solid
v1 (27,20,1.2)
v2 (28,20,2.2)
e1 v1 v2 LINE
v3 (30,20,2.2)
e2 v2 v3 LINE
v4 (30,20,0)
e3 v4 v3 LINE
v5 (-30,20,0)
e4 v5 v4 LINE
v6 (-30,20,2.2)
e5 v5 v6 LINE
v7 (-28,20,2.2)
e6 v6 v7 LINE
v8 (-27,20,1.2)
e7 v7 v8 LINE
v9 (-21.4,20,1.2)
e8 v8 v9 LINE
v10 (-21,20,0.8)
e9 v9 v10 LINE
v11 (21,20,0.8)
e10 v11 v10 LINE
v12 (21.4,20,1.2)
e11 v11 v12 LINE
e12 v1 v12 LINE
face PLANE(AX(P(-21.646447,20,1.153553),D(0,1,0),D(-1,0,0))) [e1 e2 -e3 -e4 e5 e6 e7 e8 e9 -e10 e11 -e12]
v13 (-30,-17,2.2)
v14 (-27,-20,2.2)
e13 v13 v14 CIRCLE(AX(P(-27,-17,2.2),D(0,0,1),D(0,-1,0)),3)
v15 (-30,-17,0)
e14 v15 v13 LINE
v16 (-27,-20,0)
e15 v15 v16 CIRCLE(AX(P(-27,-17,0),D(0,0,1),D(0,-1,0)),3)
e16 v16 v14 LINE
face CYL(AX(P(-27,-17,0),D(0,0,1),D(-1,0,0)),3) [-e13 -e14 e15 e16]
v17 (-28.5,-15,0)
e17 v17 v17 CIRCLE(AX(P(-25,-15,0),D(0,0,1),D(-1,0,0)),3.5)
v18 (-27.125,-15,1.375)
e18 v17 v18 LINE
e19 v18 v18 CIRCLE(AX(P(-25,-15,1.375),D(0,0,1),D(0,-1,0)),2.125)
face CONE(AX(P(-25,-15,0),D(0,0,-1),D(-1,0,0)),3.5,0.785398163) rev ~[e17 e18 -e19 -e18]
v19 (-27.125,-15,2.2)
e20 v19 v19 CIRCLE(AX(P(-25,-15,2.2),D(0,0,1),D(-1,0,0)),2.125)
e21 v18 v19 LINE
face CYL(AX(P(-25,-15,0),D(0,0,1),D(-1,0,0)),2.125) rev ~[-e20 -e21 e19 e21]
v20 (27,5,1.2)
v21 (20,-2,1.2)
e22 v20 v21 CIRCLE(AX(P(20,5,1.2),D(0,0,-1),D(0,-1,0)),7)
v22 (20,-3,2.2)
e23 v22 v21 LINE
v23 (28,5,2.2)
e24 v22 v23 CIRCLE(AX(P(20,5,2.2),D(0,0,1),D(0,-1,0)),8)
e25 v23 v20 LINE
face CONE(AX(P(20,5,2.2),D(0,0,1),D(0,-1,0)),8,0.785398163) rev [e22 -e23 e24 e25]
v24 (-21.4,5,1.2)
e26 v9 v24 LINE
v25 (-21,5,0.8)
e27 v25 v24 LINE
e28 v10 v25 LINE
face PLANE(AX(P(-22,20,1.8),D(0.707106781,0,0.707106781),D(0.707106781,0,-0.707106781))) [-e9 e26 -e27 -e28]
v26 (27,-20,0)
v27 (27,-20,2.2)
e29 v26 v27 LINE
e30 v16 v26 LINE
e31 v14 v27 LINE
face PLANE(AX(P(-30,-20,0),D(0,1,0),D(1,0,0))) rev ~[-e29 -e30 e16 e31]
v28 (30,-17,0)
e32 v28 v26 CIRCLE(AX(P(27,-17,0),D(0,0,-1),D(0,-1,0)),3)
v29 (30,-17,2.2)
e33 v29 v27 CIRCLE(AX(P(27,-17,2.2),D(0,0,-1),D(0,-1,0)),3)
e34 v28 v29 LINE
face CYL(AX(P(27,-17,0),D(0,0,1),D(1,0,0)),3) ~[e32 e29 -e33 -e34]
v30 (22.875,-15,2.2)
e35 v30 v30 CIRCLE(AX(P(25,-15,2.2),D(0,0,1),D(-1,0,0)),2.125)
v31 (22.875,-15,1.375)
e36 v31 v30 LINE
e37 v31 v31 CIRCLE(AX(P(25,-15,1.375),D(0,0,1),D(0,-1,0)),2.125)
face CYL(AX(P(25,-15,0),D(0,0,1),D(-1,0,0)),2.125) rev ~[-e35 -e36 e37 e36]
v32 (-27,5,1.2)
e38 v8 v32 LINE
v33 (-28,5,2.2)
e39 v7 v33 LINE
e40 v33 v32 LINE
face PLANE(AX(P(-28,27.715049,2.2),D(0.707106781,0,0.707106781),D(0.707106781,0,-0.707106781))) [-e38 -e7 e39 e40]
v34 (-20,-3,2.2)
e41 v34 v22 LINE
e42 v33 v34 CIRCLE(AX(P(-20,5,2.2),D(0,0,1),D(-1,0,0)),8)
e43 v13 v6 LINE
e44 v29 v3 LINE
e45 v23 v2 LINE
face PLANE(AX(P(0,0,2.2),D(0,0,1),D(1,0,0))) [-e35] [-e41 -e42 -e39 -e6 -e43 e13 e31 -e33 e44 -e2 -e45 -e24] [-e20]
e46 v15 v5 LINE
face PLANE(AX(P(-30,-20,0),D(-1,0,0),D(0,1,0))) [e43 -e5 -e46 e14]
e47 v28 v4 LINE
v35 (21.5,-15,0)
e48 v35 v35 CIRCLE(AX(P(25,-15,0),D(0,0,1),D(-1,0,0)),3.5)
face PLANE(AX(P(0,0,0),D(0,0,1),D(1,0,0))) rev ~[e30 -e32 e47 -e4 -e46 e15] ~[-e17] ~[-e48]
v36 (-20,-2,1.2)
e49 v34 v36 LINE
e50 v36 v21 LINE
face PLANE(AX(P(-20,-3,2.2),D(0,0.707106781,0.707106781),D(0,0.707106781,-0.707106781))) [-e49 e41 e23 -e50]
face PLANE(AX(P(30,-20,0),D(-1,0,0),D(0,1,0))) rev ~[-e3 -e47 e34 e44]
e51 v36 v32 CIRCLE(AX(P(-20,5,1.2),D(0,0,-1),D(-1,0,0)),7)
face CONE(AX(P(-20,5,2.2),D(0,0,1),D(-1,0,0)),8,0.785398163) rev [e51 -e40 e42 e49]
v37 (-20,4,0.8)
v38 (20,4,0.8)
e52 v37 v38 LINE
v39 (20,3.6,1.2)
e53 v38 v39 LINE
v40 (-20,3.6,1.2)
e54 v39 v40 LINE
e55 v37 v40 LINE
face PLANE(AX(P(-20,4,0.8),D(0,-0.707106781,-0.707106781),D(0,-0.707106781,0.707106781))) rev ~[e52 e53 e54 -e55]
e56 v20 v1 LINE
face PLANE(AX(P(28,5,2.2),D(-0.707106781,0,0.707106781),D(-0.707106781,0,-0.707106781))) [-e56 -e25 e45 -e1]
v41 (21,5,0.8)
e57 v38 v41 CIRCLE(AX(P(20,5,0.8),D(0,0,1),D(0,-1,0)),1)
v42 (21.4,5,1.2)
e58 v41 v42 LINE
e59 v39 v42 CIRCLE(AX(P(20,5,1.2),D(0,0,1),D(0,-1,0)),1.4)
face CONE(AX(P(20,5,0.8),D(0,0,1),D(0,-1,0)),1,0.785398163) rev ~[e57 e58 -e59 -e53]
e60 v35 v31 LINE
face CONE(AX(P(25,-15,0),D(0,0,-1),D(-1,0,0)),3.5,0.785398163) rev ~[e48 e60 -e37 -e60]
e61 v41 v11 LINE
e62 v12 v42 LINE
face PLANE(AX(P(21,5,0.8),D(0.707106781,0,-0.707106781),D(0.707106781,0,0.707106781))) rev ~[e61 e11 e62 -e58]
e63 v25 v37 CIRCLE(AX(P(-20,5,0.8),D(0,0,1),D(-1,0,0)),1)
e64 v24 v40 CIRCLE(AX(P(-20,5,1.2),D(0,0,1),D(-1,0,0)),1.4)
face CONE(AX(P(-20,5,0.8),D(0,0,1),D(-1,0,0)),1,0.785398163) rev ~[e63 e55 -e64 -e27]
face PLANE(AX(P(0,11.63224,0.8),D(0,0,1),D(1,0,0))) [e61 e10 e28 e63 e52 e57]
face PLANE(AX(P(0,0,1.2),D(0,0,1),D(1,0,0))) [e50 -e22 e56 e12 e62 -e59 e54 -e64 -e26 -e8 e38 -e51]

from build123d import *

# Parameters (mm, degrees)
F0_W           = 60
F0_H           = 40
F1_DEPTH       = 2.2
F2_D           = 4.25
F2_DEPTH       = 15
F2_CSINK_D     = 7
F2_CSINK_ANGLE = 90
F2_TIP         = 1.2768288154
F3_R           = 3
F4_W           = 50
F4_H           = 20
F5_DEPTH       = 1
F6_R           = 5
F7_T4_ANGLE    = 90
F7_T9_DEPTH    = 40
F7_T14_DEPTH   = 22.7150489639
F7_T19_ANGLE   = 90
F7_T24_DEPTH   = 22.7150489639
F9_DEPTH       = 0.4
F10_T4_ANGLE   = 90
F10_T9_DEPTH   = 40
F10_T14_DEPTH  = 15
F10_T19_ANGLE  = 90
F10_T24_DEPTH  = 15


# Not quite as in the source:
# - a fillet or chamfer that OpenCascade refuses, or shapes differently, is made with other operations: its cross-section is extruded or revolved along the edge and cut away or added


with BuildPart() as f1:
    # F0 (on Top) → F1 (new body)
    with BuildSketch(Plane.XY):
        Rectangle(F0_W, F0_H)
    extrude(amount=F1_DEPTH)

    # F2
    with Locations(Plane(origin=(0, 0, 0), x_dir=(1, 0, 0), z_dir=(0, 0, -1))):
        with Locations((-25, 15), (25, 15)):
            CounterSinkHole(F2_D / 2, F2_CSINK_D / 2, depth=F2_DEPTH, counter_sink_angle=F2_CSINK_ANGLE)
            with Locations((0, 0, -(F2_DEPTH + F2_TIP / 2))):  # 118° drill point
                Cone(0, F2_D / 2, F2_TIP, mode=Mode.SUBTRACT)

    # F3
    f3_edges = [f1.edges().sort_by_distance(p)[0] for p in [
        (-30, -20, 1.1),
        (30, -20, 1.1),
    ]]
    fillet(f3_edges, radius=F3_R)

    # F4 (on face) → F5 (cut)
    with BuildSketch(Plane.XY.offset(2.2)):
        with Locations((0, 10)):
            Rectangle(F4_W, F4_H)
    extrude(amount=-F5_DEPTH, mode=Mode.SUBTRACT)

    # F6
    f6_edges = [f1.edges().sort_by_distance(p)[0] for p in [
        (25, 0, 1.7),
        (-25, 0, 1.7),
    ]]
    fillet(f6_edges, radius=F6_R)

    # F7: chamfer of 3 on 1 edges, made by hand


with BuildPart() as f7_tool2:
    # F7_s3 → F7_t4 (revolve)
    with BuildSketch(Plane.YZ.offset(20)):
        Polygon((-3, 2.2), (0, -0.8), (0, 2.2), align=None)
    revolve(axis=Axis((20, 5, 2.2), (0, 0, 1)), revolution_arc=F7_T4_ANGLE)

    split(bisect_by=Plane.XY.offset(1.2), keep=Keep.TOP)


with BuildPart() as f1_1:
    add(f1.part)

    # F7_t1: cut F7_tool2
    add(f7_tool2.part, mode=Mode.SUBTRACT)


with BuildPart() as f7_tool7:
    # F7_s8 → F7_t9 (new body)
    with BuildSketch(Plane.YZ.offset(-20)):
        Polygon((-3, 2.2), (0, -0.8), (0, 2.2), align=None)
    extrude(amount=F7_T9_DEPTH)

    split(bisect_by=Plane.XY.offset(1.2), keep=Keep.TOP)


with BuildPart() as f1_2:
    add(f1_1.part)

    # F7_t6: cut F7_tool7
    add(f7_tool7.part, mode=Mode.SUBTRACT)


with BuildPart() as f7_tool12:
    # F7_s13 → F7_t14 (new body)
    with BuildSketch(Plane.XZ.offset(-5)):
        Polygon((28, 2.2), (25, -0.8), (25, 2.2), align=None)
    extrude(amount=-F7_T14_DEPTH)

    split(bisect_by=Plane.XY.offset(1.2), keep=Keep.TOP)


with BuildPart() as f1_3:
    add(f1_2.part)

    # F7_t11: cut F7_tool12
    add(f7_tool12.part, mode=Mode.SUBTRACT)


with BuildPart() as f7_tool17:
    # F7_s18 → F7_t19 (revolve)
    with BuildSketch(Plane.XZ.offset(-5)):
        Polygon((-28, 2.2), (-25, -0.8), (-25, 2.2), align=None)
    revolve(axis=Axis((-20, 5, 2.2), (0, 0, 1)), revolution_arc=F7_T19_ANGLE)

    split(bisect_by=Plane.XY.offset(1.2), keep=Keep.TOP)


with BuildPart() as f1_4:
    add(f1_3.part)

    # F7_t16: cut F7_tool17
    add(f7_tool17.part, mode=Mode.SUBTRACT)


with BuildPart() as f7_tool22:
    # F7_s23 → F7_t24 (new body)
    with BuildSketch(Plane.XZ.offset(-27.7150489639)):
        Polygon((-28, 2.2), (-25, -0.8), (-25, 2.2), align=None)
    extrude(amount=F7_T24_DEPTH)

    split(bisect_by=Plane.XY.offset(1.2), keep=Keep.TOP)


with BuildPart() as f1_5:
    add(f1_4.part)

    # F7_t21: cut F7_tool22
    add(f7_tool22.part, mode=Mode.SUBTRACT)

    # F8 (on face) → F9 (cut)
    with BuildSketch(Plane.XY.offset(1.2)):
        with BuildLine():
            ThreePointArc((20, 3), (21.4142135624, 3.5857864376), (22, 5))
            Line((22, 5), (22, 20))
            Line((22, 20), (-22, 20))
            Line((-22, 20), (-22, 5))
            ThreePointArc((-22, 5), (-21.4142135624, 3.5857864376), (-20, 3))
            Line((-20, 3), (20, 3))
        make_face()
    extrude(amount=-F9_DEPTH, mode=Mode.SUBTRACT)

    # F10: chamfer of 1 on 1 edges, made by hand


with BuildPart() as f10_tool2:
    # F10_s3 → F10_t4 (revolve)
    with BuildSketch(Plane.YZ.offset(20)):
        Polygon((4, 0.8), (3, 1.8), (3, 0.8), align=None)
    revolve(axis=Axis((20, 5, 0.8), (0, 0, 1)), revolution_arc=F10_T4_ANGLE)

    split(bisect_by=Plane.XY.offset(1.2), keep=Keep.BOTTOM)


with BuildPart() as f1_6:
    add(f1_5.part)

    # F10_t1: union F10_tool2
    add(f10_tool2.part)


with BuildPart() as f10_tool7:
    # F10_s8 → F10_t9 (new body)
    with BuildSketch(Plane.YZ.offset(-20)):
        Polygon((4, 0.8), (3, 1.8), (3, 0.8), align=None)
    extrude(amount=F10_T9_DEPTH)

    split(bisect_by=Plane.XY.offset(1.2), keep=Keep.BOTTOM)


with BuildPart() as f1_7:
    add(f1_6.part)

    # F10_t6: union F10_tool7
    add(f10_tool7.part)


with BuildPart() as f10_tool12:
    # F10_s13 → F10_t14 (new body)
    with BuildSketch(Plane.XZ.offset(-5)):
        Polygon((21, 0.8), (22, 1.8), (22, 0.8), align=None)
    extrude(amount=-F10_T14_DEPTH)

    split(bisect_by=Plane.XY.offset(1.2), keep=Keep.BOTTOM)


with BuildPart() as f1_8:
    add(f1_7.part)

    # F10_t11: union F10_tool12
    add(f10_tool12.part)


with BuildPart() as f10_tool17:
    # F10_s18 → F10_t19 (revolve)
    with BuildSketch(Plane.XZ.offset(-5)):
        Polygon((-21, 0.8), (-22, 1.8), (-22, 0.8), align=None)
    revolve(axis=Axis((-20, 5, 0.8), (0, 0, 1)), revolution_arc=F10_T19_ANGLE)

    split(bisect_by=Plane.XY.offset(1.2), keep=Keep.BOTTOM)


with BuildPart() as f1_9:
    add(f1_8.part)

    # F10_t16: union F10_tool17
    add(f10_tool17.part)


with BuildPart() as f10_tool22:
    # F10_s23 → F10_t24 (new body)
    with BuildSketch(Plane.XZ.offset(-20)):
        Polygon((-22, 1.8), (-21, 0.8), (-22, 0.8), align=None)
    extrude(amount=F10_T24_DEPTH)

    split(bisect_by=Plane.XY.offset(1.2), keep=Keep.BOTTOM)


with BuildPart() as f1_10:
    add(f1_9.part)

    # F10_t21: union F10_tool22
    add(f10_tool22.part)


solid = f1_10.part
